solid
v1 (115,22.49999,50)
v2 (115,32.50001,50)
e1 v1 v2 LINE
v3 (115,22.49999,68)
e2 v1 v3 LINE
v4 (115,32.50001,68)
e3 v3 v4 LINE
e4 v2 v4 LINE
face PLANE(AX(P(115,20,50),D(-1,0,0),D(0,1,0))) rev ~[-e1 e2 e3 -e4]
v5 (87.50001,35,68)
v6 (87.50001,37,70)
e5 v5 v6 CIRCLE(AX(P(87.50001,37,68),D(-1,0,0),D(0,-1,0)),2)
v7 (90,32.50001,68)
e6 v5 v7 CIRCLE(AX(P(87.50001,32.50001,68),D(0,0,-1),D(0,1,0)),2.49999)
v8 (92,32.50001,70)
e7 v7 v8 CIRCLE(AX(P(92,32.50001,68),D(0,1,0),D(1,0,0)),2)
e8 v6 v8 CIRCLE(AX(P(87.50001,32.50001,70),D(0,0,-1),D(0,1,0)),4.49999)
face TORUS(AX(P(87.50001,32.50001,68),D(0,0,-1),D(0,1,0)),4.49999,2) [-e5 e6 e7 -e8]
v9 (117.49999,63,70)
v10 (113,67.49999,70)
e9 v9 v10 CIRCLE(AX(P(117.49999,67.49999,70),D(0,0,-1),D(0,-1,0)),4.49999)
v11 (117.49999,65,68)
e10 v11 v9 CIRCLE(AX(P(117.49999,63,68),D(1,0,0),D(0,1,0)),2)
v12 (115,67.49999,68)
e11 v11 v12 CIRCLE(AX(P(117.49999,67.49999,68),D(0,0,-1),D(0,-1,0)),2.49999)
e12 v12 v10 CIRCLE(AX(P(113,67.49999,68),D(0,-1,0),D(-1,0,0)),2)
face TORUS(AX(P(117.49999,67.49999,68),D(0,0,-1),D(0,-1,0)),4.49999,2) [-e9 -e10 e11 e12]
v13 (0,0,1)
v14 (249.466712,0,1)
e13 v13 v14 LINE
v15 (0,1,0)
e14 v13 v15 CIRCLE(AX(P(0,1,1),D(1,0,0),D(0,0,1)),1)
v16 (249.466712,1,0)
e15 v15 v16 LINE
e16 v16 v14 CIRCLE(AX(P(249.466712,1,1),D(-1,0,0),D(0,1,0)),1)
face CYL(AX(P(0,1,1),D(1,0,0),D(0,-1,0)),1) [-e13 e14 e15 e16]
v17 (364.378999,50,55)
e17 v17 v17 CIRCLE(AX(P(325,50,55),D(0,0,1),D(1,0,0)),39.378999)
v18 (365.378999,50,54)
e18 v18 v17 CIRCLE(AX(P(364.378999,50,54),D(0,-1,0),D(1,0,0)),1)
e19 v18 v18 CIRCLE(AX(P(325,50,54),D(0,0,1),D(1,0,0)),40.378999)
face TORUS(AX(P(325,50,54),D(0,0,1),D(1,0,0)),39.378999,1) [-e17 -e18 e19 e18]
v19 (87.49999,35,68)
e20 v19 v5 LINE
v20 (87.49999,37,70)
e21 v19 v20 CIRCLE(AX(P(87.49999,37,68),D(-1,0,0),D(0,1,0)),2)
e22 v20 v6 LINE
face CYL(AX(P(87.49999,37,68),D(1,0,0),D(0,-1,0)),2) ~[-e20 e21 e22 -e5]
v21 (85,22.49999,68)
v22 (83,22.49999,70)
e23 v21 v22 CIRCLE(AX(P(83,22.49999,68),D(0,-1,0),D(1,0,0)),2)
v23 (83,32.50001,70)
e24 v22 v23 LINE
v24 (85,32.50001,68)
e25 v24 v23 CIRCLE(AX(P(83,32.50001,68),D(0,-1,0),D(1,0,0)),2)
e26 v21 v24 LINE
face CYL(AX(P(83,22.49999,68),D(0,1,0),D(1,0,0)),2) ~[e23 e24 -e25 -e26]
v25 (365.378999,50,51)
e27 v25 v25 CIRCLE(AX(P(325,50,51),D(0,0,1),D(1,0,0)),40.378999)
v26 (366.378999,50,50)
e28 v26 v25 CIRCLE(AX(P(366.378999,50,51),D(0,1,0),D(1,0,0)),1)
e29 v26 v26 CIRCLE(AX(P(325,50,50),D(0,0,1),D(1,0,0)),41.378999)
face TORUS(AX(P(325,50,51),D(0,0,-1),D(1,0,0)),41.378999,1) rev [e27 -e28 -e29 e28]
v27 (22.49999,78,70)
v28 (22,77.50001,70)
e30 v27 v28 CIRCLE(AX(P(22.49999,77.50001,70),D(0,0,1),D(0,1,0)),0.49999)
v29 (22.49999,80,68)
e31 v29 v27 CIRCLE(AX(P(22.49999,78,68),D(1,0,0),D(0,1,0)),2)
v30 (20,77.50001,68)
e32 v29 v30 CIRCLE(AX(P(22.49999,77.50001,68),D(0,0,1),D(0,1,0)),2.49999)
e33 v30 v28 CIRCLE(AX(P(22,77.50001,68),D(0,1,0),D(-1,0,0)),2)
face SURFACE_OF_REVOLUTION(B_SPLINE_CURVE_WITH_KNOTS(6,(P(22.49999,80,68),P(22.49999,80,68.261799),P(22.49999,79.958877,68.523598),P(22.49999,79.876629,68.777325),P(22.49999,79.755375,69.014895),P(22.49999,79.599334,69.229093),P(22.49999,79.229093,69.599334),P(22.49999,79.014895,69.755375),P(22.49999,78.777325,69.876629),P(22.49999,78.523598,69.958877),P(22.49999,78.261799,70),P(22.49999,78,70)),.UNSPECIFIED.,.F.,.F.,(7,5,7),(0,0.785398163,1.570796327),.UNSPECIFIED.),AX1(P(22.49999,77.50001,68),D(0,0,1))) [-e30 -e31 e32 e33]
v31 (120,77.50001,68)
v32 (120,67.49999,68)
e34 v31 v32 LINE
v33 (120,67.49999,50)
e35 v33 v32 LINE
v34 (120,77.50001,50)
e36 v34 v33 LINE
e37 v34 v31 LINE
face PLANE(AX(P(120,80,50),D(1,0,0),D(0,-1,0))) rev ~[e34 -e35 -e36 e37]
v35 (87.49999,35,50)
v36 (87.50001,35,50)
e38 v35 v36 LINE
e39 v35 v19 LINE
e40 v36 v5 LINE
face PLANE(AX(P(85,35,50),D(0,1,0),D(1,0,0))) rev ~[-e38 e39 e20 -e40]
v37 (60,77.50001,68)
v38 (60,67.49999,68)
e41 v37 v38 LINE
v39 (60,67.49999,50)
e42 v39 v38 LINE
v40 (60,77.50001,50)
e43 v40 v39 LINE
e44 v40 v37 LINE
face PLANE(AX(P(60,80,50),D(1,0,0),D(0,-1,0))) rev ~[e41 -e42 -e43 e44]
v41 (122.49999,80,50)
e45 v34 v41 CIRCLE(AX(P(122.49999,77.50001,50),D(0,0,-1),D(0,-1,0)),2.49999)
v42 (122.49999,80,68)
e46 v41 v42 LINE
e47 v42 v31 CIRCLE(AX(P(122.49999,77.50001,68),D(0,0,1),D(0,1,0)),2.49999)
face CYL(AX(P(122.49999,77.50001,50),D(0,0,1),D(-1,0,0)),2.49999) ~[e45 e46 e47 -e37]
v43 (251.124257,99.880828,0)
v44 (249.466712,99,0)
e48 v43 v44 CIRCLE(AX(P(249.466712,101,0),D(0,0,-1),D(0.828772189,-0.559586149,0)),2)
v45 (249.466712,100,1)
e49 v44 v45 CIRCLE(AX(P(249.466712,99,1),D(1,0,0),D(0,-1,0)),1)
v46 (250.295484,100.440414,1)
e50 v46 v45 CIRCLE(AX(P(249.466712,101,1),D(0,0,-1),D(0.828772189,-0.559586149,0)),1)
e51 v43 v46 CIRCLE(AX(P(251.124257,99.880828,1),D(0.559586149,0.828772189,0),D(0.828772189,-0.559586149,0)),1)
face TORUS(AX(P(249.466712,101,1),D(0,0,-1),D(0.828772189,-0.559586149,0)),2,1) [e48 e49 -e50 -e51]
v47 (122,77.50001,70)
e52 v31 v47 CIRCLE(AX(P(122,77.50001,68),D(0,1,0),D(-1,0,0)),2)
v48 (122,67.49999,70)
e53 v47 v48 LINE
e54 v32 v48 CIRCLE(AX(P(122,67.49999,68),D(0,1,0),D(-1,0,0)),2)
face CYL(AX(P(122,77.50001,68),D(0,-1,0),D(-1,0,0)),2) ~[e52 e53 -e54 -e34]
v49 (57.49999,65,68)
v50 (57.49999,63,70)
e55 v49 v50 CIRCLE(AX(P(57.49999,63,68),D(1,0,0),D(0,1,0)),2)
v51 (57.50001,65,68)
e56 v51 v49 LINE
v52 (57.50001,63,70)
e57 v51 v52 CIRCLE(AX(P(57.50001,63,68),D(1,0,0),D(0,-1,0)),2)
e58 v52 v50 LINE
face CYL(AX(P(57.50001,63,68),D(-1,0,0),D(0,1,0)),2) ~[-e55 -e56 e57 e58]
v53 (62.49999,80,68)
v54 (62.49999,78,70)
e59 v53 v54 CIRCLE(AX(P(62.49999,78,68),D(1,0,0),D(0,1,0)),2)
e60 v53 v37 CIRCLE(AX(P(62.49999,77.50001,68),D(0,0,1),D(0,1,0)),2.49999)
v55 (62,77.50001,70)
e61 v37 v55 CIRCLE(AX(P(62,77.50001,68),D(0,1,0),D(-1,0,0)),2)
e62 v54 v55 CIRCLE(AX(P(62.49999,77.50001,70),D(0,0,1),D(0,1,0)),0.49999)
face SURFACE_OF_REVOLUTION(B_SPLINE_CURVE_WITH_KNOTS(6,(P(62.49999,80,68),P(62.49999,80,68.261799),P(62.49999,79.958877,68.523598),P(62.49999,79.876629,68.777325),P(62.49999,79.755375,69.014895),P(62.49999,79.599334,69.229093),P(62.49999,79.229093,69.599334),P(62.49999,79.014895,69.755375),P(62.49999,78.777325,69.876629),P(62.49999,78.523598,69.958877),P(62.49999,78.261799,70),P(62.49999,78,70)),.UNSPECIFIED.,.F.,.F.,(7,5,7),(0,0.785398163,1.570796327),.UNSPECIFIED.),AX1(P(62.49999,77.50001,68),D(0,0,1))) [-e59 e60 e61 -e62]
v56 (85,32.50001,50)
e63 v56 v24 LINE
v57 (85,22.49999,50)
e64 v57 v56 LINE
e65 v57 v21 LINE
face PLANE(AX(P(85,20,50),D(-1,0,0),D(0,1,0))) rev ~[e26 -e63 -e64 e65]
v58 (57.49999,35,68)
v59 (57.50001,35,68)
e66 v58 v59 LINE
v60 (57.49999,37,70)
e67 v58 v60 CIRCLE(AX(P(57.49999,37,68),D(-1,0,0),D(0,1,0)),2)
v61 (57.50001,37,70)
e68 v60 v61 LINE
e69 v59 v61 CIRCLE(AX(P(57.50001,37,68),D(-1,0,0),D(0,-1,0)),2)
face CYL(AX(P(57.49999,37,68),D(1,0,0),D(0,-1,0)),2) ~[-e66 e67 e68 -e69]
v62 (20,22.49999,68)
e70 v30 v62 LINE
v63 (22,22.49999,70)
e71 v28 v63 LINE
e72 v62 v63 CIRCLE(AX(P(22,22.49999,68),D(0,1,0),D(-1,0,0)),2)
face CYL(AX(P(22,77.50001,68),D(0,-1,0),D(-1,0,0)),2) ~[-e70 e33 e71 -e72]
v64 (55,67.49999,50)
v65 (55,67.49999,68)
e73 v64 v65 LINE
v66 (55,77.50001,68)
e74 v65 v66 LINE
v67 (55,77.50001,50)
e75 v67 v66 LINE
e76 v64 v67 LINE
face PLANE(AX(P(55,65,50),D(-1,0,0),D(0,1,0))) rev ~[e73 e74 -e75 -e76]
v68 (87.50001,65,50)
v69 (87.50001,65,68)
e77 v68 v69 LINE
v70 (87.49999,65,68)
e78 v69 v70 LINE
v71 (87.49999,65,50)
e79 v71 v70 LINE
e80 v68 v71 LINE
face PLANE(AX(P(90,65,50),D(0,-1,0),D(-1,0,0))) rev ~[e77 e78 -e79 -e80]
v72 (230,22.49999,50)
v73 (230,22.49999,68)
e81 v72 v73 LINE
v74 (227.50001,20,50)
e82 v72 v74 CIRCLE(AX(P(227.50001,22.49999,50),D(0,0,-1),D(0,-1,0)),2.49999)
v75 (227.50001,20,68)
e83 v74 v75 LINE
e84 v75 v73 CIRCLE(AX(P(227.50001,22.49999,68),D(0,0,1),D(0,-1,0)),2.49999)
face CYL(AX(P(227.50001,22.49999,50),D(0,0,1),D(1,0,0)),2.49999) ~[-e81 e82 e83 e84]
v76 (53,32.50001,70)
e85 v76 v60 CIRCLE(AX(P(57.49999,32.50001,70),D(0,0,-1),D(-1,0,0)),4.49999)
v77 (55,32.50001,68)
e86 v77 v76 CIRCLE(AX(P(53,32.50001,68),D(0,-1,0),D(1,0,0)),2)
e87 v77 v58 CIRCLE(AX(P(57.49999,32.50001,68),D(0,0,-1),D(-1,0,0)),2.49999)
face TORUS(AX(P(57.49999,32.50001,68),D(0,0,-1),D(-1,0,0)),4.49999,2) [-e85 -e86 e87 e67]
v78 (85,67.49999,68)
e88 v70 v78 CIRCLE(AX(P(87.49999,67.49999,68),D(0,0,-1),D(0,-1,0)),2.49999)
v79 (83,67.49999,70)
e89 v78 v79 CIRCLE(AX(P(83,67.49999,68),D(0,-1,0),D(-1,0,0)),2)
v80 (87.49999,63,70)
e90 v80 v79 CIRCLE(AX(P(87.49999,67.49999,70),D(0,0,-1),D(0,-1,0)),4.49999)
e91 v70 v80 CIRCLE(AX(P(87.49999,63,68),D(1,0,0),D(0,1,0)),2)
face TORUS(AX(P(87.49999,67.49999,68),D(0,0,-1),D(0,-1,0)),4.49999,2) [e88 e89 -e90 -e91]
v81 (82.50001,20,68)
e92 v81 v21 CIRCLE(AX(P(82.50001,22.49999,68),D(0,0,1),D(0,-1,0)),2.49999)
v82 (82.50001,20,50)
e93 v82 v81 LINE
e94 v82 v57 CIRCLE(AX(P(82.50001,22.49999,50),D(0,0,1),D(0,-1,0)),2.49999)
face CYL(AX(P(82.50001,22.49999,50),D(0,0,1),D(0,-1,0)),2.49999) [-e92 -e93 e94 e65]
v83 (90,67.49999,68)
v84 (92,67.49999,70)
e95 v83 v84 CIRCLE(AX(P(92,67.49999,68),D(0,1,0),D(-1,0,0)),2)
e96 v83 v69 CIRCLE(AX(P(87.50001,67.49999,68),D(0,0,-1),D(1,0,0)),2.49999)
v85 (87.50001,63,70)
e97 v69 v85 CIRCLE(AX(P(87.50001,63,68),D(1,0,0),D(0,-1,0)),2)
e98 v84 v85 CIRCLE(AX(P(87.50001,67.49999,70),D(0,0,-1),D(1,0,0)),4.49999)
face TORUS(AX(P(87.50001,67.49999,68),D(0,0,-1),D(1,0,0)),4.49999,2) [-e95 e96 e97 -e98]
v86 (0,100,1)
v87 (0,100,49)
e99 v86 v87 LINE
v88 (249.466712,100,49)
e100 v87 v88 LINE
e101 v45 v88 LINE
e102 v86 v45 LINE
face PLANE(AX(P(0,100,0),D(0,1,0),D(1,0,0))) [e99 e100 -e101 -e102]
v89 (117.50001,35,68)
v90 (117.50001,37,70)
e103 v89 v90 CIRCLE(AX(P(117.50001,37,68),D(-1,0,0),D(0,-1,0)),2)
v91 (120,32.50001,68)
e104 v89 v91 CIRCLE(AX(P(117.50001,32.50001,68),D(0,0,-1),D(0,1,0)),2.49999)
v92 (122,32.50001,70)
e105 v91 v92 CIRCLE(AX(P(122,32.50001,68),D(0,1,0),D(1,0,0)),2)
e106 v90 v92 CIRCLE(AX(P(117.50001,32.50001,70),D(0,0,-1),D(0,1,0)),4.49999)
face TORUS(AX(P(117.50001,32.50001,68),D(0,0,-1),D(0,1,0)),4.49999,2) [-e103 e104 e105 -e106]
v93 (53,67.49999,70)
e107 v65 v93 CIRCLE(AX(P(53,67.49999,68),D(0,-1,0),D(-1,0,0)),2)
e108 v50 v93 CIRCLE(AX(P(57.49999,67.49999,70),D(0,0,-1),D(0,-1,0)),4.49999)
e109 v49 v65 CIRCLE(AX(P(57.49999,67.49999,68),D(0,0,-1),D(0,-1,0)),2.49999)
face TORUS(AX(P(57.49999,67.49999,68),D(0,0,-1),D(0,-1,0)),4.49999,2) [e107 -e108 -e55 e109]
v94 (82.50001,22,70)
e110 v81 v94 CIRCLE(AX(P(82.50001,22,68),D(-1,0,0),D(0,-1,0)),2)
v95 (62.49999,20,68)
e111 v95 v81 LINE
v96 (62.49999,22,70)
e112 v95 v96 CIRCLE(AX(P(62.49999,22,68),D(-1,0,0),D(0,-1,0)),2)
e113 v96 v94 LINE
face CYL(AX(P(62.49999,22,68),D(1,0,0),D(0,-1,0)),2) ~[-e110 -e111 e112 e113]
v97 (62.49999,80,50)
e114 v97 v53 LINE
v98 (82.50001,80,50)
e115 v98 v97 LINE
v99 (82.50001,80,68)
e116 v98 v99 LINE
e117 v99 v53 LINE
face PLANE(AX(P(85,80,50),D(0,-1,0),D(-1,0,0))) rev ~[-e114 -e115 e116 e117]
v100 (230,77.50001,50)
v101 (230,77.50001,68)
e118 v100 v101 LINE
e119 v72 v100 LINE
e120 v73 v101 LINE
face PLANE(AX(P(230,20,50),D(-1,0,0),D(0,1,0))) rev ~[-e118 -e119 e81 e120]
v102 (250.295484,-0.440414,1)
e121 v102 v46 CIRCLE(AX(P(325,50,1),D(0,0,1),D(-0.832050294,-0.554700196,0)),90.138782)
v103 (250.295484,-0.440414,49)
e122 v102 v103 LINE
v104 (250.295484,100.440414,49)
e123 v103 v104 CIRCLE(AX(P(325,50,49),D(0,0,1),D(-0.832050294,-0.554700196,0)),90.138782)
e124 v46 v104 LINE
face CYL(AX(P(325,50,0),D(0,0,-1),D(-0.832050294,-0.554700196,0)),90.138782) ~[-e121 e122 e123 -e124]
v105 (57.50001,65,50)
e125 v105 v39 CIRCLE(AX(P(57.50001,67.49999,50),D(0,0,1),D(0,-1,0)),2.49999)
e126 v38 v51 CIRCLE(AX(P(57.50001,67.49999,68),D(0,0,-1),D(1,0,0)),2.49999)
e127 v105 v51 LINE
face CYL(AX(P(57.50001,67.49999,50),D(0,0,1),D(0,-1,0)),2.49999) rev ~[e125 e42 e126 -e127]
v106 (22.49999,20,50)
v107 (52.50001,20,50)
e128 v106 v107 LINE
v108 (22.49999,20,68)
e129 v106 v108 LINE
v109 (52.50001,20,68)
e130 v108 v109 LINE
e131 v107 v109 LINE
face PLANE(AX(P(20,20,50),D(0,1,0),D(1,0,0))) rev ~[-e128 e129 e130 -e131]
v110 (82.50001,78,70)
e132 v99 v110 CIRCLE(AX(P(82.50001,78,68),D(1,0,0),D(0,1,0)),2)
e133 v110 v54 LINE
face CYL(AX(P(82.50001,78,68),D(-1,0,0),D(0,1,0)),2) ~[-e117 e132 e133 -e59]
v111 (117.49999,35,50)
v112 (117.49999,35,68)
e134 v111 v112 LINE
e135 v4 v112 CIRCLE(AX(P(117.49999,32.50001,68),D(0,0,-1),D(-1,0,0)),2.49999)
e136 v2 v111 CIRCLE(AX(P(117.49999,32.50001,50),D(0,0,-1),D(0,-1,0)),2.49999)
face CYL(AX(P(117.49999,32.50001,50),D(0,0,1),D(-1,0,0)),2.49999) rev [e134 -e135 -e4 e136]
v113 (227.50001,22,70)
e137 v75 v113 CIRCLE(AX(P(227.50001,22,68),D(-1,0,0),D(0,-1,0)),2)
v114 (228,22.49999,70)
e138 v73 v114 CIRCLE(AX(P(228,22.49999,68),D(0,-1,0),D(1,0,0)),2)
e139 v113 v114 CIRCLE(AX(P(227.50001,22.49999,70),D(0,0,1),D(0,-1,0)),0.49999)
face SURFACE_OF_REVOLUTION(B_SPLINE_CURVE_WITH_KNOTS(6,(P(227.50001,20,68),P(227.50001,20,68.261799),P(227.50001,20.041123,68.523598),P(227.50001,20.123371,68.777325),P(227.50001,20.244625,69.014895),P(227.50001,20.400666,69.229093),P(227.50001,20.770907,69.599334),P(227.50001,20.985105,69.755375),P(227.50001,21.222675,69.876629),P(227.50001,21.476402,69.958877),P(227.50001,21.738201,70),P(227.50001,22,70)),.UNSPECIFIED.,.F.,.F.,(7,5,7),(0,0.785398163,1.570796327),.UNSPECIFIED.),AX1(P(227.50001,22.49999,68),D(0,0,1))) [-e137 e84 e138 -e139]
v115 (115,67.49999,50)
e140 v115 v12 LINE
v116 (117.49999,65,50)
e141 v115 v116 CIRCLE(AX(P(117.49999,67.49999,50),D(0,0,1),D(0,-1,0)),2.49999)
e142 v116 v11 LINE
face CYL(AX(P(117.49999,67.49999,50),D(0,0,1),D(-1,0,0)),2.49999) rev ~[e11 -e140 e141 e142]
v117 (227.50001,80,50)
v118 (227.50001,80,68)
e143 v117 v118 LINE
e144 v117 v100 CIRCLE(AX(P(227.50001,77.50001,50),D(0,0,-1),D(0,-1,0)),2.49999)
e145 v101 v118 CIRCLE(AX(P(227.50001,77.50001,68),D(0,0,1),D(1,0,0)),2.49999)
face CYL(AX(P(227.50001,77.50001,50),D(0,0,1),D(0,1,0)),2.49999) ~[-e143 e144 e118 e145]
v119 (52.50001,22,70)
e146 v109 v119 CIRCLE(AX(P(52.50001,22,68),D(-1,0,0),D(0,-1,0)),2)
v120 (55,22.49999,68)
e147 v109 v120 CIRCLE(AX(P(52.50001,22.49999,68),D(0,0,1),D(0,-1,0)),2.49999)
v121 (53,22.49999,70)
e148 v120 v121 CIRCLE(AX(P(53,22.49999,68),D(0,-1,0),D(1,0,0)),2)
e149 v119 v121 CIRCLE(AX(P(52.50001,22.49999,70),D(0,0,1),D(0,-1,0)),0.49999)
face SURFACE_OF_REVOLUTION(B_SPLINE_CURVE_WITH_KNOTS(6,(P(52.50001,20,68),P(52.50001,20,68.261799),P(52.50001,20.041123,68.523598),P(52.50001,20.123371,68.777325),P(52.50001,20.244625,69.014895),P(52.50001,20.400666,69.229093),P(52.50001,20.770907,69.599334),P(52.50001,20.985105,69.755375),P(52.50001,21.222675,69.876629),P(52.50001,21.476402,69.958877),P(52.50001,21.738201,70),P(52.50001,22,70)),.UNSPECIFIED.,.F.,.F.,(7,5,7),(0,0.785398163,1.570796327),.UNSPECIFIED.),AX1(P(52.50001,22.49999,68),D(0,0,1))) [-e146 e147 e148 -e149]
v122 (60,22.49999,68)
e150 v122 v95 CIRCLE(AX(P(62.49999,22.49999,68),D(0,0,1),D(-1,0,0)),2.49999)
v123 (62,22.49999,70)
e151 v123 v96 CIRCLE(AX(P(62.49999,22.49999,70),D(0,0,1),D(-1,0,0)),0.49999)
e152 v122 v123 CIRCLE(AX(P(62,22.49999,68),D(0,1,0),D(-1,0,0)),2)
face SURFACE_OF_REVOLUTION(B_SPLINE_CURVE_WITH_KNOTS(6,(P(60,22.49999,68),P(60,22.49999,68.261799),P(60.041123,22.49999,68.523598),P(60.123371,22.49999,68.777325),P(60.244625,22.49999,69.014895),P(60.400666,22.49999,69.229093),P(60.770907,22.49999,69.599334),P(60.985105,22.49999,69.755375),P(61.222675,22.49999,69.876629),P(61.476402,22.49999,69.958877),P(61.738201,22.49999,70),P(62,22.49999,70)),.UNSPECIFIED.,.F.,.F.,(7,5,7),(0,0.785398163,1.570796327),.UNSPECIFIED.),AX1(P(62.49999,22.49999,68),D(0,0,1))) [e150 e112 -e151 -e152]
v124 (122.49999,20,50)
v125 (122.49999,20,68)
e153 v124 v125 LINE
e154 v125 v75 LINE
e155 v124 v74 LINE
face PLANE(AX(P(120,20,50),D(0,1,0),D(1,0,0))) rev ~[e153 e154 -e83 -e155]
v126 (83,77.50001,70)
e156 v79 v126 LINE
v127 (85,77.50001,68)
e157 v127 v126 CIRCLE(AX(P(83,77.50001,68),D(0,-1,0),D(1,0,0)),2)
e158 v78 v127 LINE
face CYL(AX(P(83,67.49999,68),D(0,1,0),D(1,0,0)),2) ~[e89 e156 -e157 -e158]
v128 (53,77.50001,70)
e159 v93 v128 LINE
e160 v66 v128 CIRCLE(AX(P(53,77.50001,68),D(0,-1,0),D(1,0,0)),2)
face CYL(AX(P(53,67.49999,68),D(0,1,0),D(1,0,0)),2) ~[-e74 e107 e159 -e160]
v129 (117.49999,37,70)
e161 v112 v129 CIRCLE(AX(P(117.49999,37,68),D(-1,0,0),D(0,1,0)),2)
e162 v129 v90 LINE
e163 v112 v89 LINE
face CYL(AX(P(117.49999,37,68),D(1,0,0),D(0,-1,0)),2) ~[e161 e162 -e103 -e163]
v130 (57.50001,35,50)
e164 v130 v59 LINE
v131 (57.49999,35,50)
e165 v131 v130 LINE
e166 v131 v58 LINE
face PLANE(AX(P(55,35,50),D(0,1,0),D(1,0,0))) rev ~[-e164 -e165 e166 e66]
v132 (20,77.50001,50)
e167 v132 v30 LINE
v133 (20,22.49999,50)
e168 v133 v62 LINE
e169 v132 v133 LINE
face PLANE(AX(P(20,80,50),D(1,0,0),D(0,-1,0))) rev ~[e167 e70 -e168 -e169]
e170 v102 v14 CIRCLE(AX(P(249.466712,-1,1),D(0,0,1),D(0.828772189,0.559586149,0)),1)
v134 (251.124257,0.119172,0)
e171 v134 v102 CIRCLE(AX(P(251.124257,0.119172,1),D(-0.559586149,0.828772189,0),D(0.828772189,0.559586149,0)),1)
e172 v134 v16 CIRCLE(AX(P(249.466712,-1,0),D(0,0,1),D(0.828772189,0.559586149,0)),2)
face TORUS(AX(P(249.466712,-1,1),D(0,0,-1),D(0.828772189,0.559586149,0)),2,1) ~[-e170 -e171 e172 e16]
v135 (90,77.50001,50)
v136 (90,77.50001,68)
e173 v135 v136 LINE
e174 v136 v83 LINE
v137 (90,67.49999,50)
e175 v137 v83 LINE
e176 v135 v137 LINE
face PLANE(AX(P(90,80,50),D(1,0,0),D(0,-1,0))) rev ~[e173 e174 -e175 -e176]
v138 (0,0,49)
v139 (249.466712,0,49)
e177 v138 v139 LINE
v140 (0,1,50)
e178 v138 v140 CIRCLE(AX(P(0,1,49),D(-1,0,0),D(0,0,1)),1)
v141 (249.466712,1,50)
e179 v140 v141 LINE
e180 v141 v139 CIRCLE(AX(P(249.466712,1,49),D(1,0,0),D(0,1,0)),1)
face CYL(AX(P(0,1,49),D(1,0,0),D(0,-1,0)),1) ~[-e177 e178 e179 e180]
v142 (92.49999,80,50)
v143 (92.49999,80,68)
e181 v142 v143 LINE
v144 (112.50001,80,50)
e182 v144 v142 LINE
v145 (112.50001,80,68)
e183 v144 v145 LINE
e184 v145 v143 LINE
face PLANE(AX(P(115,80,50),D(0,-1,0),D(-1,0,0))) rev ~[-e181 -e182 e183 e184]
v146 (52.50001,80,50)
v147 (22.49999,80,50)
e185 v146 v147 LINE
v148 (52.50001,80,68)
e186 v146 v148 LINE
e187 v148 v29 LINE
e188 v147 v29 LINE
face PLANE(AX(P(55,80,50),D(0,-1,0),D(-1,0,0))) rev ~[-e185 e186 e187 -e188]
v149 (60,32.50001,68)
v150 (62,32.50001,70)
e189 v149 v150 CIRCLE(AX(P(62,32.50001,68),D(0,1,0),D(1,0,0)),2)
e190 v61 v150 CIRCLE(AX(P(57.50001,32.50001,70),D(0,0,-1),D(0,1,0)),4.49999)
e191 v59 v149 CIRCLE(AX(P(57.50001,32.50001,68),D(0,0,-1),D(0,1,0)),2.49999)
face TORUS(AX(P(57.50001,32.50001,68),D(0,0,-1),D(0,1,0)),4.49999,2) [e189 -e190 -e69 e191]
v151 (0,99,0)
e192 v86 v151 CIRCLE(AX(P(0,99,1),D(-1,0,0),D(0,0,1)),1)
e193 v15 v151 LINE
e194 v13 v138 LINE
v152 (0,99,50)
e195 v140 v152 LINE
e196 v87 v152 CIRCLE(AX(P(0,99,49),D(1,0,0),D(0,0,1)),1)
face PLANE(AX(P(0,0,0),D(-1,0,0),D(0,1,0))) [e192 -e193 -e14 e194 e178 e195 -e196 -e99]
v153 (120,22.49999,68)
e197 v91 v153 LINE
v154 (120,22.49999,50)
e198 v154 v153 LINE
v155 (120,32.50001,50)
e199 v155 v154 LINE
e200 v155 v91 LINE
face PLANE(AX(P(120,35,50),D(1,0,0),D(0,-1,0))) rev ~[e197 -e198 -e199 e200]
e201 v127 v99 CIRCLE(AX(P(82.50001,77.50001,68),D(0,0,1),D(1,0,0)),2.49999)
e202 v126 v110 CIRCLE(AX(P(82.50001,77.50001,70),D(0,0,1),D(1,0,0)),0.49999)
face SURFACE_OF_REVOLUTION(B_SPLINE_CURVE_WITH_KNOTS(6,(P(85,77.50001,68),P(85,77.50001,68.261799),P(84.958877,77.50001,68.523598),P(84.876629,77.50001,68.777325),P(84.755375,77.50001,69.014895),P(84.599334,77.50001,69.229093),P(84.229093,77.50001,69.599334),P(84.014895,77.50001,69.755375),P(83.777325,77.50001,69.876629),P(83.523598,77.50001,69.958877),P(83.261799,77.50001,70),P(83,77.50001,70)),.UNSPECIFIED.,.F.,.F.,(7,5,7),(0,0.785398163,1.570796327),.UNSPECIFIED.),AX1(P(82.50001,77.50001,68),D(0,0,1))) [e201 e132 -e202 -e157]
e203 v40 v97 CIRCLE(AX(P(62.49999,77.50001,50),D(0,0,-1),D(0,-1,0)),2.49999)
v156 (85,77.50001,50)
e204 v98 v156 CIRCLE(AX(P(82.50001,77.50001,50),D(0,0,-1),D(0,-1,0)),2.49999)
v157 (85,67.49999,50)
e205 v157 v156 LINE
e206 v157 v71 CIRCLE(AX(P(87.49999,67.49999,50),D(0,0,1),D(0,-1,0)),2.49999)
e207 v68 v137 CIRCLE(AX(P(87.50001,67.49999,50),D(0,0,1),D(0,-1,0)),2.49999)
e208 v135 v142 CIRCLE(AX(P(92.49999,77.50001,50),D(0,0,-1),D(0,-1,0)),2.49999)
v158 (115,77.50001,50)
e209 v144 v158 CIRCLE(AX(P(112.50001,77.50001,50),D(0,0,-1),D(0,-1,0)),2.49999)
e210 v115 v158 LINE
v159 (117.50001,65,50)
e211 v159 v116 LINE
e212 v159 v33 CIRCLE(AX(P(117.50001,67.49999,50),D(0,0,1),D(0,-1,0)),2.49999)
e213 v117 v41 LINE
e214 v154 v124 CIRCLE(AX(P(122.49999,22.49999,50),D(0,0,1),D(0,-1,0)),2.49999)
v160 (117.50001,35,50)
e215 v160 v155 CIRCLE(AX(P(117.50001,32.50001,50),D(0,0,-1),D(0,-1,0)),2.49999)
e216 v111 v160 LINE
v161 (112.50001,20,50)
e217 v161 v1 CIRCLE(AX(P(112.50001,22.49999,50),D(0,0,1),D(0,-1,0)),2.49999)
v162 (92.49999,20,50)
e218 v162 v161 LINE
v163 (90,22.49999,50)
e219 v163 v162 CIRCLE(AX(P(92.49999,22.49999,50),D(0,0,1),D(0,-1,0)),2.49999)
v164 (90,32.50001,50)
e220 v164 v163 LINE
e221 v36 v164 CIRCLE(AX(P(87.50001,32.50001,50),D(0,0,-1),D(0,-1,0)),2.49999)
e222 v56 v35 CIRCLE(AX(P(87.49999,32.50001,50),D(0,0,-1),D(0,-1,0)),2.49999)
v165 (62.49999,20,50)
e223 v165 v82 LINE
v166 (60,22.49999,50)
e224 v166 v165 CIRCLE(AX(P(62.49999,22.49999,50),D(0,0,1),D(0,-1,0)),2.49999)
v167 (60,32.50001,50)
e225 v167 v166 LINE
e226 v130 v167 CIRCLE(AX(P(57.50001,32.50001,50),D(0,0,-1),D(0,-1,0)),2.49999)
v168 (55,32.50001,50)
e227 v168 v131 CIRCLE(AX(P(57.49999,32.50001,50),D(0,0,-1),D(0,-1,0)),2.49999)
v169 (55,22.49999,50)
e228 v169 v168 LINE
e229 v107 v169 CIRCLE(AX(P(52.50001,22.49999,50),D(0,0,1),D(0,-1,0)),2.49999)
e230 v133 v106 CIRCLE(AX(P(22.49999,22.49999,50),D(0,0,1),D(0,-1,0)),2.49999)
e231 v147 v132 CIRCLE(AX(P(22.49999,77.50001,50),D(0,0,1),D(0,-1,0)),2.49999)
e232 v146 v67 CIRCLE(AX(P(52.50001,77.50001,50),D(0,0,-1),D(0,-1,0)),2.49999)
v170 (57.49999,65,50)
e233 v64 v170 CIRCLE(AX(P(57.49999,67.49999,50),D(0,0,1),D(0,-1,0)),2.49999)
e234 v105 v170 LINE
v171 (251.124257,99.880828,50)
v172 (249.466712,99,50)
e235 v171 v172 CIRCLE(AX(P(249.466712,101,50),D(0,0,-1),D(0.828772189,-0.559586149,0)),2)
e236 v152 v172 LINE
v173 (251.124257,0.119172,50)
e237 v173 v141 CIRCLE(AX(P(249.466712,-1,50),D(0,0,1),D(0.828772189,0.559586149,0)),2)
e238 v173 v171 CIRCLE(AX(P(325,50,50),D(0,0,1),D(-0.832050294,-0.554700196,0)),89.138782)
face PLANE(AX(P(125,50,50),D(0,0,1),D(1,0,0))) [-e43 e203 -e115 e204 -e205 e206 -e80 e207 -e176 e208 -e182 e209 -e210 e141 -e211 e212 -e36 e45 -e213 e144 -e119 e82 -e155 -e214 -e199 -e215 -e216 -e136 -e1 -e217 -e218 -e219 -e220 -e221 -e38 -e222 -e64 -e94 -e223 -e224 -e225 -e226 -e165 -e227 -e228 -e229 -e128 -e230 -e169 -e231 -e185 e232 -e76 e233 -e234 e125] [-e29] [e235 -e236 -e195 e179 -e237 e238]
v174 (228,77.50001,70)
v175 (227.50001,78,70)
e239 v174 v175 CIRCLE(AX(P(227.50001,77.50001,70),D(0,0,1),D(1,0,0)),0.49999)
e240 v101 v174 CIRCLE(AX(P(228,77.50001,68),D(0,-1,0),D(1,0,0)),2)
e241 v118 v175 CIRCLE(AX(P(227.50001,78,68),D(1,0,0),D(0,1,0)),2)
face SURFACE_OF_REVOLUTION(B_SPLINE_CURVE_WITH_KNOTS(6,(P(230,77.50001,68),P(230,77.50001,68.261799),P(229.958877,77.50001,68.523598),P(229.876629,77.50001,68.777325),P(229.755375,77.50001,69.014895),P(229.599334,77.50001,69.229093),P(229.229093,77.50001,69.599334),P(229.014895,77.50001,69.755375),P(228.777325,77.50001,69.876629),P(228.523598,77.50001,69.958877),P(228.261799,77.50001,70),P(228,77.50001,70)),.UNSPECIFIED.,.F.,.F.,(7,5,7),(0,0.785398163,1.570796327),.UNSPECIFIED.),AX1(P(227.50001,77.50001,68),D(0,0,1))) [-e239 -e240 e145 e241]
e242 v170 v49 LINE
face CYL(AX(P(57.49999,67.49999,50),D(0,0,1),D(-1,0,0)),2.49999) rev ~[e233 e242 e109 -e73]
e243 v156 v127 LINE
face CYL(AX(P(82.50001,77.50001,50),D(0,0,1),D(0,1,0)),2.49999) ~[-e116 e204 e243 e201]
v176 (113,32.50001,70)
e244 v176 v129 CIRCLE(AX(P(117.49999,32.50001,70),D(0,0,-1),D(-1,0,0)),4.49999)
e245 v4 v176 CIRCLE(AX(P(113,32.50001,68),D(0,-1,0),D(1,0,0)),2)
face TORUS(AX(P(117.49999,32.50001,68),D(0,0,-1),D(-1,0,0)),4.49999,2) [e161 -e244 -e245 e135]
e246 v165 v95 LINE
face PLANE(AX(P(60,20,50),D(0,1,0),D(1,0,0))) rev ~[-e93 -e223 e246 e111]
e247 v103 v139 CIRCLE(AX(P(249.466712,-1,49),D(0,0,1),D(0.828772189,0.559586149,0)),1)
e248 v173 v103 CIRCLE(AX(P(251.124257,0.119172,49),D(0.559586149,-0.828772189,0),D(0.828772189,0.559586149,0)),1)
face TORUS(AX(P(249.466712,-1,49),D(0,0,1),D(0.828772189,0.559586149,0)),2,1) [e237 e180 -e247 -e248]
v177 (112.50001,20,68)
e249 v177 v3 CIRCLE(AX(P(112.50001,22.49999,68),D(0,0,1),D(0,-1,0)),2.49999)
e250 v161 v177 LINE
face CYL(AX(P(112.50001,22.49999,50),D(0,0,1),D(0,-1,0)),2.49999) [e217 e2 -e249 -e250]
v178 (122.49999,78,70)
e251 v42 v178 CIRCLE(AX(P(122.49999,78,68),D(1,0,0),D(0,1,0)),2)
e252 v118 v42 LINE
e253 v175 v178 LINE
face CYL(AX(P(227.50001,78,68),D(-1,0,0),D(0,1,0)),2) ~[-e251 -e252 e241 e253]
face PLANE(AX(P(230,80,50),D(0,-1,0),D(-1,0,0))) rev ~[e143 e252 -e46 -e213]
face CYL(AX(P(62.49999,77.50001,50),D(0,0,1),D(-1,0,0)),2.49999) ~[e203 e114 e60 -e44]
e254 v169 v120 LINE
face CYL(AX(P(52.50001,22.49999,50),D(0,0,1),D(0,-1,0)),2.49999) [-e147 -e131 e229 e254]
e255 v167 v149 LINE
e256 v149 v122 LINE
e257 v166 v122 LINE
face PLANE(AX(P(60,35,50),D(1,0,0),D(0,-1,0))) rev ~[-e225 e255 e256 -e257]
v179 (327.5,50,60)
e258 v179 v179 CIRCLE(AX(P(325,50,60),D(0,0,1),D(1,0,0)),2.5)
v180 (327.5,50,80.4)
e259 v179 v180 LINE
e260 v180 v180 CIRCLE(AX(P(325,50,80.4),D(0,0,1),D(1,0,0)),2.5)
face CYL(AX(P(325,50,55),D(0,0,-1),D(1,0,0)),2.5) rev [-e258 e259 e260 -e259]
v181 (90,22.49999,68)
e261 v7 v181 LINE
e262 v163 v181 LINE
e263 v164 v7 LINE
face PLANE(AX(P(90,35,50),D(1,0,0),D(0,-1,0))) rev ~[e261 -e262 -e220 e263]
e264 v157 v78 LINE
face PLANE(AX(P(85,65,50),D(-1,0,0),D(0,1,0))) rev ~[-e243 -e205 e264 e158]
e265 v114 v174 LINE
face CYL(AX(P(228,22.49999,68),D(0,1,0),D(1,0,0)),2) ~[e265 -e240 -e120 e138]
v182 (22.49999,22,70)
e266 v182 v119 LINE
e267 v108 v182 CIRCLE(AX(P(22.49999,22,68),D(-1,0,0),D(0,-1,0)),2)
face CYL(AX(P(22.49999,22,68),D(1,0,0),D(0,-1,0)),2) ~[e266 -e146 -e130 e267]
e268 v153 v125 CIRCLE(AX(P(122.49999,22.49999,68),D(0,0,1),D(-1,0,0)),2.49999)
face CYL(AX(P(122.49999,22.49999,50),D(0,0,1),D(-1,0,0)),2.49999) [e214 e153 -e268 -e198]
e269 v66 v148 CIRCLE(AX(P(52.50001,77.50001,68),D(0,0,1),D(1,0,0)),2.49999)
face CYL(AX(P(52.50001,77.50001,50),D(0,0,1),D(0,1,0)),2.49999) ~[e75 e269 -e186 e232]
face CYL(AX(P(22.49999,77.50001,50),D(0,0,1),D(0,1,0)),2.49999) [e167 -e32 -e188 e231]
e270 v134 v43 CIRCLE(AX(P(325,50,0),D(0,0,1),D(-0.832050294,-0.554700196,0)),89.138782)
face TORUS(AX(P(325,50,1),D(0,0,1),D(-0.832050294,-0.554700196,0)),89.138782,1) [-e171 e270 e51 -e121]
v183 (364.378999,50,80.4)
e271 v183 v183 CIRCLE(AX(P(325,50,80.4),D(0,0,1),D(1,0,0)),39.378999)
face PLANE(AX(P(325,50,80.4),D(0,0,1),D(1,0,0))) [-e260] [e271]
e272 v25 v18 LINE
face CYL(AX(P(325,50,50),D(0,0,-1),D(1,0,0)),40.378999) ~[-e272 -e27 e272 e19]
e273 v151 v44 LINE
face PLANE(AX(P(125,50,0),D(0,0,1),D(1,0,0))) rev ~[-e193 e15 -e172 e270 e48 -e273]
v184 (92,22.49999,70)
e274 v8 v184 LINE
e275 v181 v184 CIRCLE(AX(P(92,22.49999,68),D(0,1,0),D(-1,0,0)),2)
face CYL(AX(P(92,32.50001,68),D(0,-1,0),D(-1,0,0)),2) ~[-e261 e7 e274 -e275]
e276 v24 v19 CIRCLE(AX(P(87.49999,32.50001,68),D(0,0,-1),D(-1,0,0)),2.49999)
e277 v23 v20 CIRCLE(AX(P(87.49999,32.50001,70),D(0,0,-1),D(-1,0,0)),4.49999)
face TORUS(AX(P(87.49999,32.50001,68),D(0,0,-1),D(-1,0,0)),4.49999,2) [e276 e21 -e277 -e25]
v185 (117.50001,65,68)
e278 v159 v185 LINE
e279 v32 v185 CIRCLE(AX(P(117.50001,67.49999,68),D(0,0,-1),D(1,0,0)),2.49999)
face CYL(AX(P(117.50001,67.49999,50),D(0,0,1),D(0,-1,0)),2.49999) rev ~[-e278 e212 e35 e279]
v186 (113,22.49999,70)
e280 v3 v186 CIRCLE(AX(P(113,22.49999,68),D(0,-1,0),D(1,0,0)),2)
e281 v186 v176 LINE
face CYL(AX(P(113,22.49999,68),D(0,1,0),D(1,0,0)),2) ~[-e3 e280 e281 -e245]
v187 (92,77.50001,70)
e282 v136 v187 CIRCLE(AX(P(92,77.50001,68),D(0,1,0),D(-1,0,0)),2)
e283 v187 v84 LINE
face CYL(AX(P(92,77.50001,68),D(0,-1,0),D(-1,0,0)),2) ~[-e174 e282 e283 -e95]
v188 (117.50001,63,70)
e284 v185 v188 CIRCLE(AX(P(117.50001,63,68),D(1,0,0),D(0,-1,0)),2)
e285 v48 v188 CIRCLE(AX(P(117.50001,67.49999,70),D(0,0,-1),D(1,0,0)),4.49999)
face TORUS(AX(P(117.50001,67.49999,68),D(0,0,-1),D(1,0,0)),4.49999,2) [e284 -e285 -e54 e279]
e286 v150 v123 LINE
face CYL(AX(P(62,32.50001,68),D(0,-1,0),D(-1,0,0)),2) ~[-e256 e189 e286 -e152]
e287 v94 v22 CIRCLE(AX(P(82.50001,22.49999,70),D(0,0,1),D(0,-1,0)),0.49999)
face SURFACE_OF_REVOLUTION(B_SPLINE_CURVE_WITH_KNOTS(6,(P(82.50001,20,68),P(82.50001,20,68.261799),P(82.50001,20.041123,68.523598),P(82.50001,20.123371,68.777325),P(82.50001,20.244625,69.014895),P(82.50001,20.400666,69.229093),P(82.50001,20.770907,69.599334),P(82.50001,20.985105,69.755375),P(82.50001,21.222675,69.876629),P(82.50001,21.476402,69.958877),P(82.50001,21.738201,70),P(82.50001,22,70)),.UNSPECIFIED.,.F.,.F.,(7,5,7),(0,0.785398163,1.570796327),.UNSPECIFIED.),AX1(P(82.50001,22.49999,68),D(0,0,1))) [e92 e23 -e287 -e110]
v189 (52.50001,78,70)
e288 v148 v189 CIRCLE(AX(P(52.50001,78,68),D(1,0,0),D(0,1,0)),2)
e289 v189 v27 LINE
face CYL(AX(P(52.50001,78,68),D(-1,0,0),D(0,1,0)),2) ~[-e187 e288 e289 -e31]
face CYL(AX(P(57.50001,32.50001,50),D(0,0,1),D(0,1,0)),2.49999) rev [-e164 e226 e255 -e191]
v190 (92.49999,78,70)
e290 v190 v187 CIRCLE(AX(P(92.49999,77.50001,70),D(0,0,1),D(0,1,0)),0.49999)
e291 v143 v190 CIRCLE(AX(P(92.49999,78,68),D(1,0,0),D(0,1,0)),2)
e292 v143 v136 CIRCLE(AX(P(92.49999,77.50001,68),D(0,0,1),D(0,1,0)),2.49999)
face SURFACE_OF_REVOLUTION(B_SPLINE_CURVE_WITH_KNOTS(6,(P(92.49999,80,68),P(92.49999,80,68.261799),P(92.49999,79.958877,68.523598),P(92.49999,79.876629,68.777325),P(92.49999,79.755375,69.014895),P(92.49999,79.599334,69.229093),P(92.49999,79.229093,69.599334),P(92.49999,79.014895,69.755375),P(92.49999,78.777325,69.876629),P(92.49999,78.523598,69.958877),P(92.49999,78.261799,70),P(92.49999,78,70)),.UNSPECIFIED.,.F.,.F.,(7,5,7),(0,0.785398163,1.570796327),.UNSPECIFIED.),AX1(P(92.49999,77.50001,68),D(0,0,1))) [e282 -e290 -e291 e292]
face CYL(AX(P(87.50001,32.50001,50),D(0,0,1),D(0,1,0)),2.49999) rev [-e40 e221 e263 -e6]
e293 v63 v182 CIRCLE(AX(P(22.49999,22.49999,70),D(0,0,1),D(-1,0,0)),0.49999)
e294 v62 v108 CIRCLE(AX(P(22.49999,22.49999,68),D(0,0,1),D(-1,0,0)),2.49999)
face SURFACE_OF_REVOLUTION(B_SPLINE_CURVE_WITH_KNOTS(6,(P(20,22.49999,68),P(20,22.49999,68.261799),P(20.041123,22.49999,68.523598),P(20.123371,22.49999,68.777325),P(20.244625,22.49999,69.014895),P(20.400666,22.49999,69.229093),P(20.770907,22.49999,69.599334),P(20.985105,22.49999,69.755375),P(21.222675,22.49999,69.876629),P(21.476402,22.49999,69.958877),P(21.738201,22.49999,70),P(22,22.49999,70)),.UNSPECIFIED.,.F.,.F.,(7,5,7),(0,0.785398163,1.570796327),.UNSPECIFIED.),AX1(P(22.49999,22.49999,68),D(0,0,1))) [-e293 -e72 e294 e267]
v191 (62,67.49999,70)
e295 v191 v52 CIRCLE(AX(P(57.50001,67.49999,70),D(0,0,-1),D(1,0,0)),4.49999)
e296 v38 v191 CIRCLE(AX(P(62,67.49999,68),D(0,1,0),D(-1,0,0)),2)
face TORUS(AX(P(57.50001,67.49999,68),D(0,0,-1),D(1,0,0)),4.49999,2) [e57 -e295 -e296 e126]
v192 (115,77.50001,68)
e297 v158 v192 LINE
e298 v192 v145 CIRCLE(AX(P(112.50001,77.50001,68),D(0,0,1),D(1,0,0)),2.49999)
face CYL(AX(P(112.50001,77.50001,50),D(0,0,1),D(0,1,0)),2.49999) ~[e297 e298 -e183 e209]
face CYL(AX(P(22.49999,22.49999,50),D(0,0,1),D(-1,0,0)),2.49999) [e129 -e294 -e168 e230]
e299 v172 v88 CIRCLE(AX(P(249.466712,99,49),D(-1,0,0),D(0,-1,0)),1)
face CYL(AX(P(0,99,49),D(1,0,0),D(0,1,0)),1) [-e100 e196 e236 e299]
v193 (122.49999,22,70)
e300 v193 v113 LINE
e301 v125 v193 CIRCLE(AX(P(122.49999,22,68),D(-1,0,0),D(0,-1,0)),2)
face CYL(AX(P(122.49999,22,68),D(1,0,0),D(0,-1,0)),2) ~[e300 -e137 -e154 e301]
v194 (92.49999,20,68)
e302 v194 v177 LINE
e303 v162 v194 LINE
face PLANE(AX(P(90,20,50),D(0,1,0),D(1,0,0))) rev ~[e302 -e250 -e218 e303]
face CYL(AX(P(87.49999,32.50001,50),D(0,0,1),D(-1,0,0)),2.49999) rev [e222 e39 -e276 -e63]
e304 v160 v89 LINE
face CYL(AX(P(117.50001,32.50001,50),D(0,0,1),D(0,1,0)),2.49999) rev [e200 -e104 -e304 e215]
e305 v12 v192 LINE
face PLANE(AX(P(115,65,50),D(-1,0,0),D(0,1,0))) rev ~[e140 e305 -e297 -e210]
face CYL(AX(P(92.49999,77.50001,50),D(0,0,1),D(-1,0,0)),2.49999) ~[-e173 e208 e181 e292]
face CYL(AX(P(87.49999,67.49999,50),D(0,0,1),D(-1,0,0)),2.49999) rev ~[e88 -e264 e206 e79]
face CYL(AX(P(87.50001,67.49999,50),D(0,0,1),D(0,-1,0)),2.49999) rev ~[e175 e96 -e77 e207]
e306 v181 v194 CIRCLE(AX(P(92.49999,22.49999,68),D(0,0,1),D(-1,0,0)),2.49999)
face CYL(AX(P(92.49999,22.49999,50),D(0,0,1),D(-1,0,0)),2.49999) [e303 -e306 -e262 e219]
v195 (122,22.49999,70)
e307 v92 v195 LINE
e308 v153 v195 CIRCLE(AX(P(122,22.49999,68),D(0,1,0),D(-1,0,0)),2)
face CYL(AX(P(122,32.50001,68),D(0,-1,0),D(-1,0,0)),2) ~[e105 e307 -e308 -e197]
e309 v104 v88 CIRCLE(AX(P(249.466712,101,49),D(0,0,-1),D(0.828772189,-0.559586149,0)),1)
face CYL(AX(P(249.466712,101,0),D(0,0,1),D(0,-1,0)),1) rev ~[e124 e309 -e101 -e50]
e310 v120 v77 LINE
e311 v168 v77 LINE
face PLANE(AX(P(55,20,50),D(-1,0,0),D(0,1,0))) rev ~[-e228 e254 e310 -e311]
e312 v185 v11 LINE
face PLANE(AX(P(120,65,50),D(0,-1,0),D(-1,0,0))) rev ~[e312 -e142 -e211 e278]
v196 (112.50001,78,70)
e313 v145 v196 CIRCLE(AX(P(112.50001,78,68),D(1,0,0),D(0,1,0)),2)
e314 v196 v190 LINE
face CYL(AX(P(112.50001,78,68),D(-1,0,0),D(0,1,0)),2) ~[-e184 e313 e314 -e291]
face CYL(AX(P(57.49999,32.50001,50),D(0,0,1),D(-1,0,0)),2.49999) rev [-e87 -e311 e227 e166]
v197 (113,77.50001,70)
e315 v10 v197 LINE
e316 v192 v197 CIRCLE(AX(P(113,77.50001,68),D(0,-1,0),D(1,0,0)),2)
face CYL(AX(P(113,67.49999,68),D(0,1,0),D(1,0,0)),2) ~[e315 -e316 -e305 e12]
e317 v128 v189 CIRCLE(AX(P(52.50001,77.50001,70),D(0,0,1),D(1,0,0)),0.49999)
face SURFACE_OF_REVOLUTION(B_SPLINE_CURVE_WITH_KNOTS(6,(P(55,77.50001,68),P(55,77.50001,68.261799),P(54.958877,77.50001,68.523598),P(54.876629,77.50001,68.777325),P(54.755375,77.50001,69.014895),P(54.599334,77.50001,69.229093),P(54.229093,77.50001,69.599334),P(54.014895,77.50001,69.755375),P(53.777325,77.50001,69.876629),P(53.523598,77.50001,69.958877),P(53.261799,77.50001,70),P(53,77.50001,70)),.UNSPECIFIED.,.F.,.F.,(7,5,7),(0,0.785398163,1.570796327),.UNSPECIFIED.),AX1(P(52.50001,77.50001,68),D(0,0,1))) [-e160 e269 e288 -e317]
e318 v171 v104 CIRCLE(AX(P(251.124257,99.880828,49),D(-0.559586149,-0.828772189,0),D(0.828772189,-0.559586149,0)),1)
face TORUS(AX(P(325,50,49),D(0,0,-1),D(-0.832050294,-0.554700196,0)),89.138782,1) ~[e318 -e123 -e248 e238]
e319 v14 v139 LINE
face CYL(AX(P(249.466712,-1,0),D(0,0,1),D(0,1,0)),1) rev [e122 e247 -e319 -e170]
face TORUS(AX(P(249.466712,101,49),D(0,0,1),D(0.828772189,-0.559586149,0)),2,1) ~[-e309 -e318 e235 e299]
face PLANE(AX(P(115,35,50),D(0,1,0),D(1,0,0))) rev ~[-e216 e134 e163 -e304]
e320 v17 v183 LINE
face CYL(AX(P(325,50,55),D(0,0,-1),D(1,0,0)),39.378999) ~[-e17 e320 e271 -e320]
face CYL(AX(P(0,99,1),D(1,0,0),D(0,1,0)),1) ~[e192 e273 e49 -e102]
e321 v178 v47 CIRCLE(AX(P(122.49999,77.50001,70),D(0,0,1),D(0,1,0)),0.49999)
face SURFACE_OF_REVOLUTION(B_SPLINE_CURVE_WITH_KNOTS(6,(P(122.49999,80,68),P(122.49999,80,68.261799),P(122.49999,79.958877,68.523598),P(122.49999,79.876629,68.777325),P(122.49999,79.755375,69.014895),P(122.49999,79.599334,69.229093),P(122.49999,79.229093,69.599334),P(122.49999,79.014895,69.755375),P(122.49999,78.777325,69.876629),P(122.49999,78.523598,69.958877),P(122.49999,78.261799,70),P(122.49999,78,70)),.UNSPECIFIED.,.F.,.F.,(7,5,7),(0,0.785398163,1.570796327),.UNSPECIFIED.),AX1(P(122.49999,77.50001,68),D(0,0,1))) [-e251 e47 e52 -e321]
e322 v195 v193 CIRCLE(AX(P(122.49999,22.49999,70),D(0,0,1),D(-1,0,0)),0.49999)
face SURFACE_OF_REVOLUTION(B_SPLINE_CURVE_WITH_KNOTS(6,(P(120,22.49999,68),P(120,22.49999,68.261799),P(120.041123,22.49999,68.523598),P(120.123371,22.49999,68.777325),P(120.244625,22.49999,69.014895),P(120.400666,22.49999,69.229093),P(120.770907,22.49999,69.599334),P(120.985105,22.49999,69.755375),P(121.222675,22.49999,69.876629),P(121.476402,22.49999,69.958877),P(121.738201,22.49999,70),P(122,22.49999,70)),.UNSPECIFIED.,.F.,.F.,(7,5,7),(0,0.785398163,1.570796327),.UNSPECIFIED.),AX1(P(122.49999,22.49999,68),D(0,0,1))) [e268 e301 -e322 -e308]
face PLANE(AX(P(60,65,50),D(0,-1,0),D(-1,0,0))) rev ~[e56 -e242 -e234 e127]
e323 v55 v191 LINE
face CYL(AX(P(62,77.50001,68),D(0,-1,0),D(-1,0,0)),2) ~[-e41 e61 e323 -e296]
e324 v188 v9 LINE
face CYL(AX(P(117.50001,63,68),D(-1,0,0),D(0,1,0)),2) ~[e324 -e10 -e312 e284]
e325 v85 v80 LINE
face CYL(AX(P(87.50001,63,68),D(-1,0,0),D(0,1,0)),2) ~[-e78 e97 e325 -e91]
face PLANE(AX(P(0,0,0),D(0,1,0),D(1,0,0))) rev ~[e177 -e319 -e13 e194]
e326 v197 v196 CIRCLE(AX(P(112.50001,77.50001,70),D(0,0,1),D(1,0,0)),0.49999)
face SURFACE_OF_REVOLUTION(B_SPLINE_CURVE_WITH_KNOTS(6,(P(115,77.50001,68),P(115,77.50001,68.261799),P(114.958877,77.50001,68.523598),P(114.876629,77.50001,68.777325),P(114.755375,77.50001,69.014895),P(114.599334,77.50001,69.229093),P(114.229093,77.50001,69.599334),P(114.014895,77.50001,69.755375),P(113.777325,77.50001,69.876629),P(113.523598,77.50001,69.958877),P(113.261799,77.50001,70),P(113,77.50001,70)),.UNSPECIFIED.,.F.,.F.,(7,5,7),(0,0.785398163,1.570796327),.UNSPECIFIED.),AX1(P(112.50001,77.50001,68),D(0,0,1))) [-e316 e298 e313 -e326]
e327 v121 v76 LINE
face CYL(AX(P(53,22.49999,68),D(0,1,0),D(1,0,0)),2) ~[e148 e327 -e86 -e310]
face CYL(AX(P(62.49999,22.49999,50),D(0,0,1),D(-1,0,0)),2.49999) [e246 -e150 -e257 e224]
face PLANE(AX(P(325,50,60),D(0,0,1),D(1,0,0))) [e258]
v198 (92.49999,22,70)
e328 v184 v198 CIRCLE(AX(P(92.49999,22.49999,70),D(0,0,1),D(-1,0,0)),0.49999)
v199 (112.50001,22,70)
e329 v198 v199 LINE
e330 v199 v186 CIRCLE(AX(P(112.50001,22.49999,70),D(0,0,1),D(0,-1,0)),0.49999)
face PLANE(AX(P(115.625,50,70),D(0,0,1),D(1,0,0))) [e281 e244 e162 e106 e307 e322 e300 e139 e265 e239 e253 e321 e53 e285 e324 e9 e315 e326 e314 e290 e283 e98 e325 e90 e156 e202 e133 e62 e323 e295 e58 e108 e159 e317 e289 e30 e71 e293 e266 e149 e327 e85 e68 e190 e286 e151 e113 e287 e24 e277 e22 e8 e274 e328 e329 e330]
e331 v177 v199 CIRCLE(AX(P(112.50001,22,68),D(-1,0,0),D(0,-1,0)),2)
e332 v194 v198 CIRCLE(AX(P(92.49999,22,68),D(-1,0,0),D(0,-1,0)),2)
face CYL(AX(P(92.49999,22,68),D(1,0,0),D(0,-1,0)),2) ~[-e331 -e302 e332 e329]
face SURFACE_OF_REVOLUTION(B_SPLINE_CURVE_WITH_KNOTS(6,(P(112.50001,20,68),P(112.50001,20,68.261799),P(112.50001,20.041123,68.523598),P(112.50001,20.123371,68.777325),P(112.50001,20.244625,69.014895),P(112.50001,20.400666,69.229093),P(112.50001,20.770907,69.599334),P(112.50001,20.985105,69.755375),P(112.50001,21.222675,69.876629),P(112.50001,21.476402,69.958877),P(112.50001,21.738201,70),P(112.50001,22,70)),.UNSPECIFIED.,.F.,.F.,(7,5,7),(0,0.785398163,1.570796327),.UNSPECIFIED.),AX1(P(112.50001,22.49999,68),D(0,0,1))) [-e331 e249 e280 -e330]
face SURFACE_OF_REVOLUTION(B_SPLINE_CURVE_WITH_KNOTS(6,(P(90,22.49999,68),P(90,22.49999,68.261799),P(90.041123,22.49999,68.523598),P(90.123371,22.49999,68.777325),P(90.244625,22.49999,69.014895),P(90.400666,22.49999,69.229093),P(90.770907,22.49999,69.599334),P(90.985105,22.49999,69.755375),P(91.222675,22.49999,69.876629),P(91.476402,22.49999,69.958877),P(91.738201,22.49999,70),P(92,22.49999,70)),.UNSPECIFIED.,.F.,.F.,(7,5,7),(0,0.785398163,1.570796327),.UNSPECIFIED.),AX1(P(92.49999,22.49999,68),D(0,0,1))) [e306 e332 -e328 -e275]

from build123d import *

# Parameters (mm, degrees)
F0_W      = 250
F0_H      = 100
F1_DEPTH  = 50
F3_DEPTH  = 20
F4_R      = 40.3789988007
F5_DEPTH  = 5
F6_R      = 2.5
F7_DEPTH  = 5
F8_R      = 1
F9_R      = 2.49999
F10_R     = 2
F11_DEPTH = 25.4


# Not quite as in the source:
# - a fillet or chamfer is up to 0.001 mm smaller than in the source, because OpenCascade refuses the exact size


with BuildPart() as f1:
    # F0 (on Top) → F1 (new body)
    with BuildSketch(Plane.XY):
        with Locations((125, 50)):
            Rectangle(F0_W, F0_H)
        with BuildLine():
            Line((250, 100), (250, 0))
            ThreePointArc((250, 0), (415.1387818866, 50), (250, 100))
        make_face()
    extrude(amount=F1_DEPTH)

    # F2 (on face) → F3 (join)
    with BuildSketch(Plane.XY.offset(50)):
        Polygon((55, 80), (20, 80), (20, 20), (55, 20), (55, 35), (60, 35), (60, 20), (85, 20), (85, 35), (90, 35), (90, 20), (115, 20), (115, 35), (120, 35), (120, 20), (230, 20), (230, 80), (120, 80), (120, 65), (115, 65), (115, 80), (90, 80), (90, 65), (85, 65), (85, 80), (60, 80), (60, 65), (55, 65), align=None)
    extrude(amount=F3_DEPTH)

    # F4 (on face) → F5 (join)
    with BuildSketch(Plane.XY.offset(50)):
        with Locations((325, 50)):
            Circle(F4_R)
    extrude(amount=F5_DEPTH)

    # F6 (on face) → F7 (join)
    with BuildSketch(Plane.XY.offset(55)):
        with Locations((325, 50)):
            Circle(F6_R)
    extrude(amount=F7_DEPTH)

    # F8
    f8_edges = [f1.edges().sort_by_distance(p)[0] for p in [
        (250, 0, 25),
        (250, 100, 25),
        (415.138782, 50, 0),
        (415.138782, 50, 50),
        (284.621001, 50, 55),
        (284.621001, 50, 50),
        (125, 100, 0),
        (125, 100, 50),
        (125, 0, 0),
        (125, 0, 50),
    ]]
    fillet(f8_edges, radius=F8_R)

    # F9 (radius 2.5 in the source; OpenCascade refuses exactly that, so slightly less here)
    f9_edges = [f1.edges().sort_by_distance(p)[0] for p in [
        (55, 35, 60),
        (55, 20, 60),
        (60, 35, 60),
        (60, 20, 60),
        (85, 20, 60),
        (90, 35, 60),
        (90, 20, 60),
        (115, 20, 60),
        (120, 35, 60),
        (120, 20, 60),
        (85, 35, 60),
        (115, 35, 60),
        (55, 65, 60),
        (55, 80, 60),
        (85, 65, 60),
        (85, 80, 60),
        (115, 65, 60),
        (115, 80, 60),
        (60, 65, 60),
        (60, 80, 60),
        (90, 65, 60),
        (90, 80, 60),
        (120, 65, 60),
        (120, 80, 60),
        (20, 80, 60),
        (20, 20, 60),
        (230, 80, 60),
        (230, 20, 60),
    ]]
    fillet(f9_edges, radius=F9_R)

    # F10
    f10_edges = [f1.edges().sort_by_distance(p)[0] for p in [
        (175, 80, 70),
        (230, 50, 70),
        (37.5, 80, 70),
        (54.26777, 79.26777, 70),
        (20.73223, 79.26777, 70),
        (55, 72.5, 70),
        (20, 50, 70),
        (55.73223, 65.73223, 70),
        (20.73223, 20.73223, 70),
        (57.5, 65, 70),
        (37.5, 20, 70),
        (59.26777, 65.73223, 70),
        (54.26777, 20.73223, 70),
        (60, 72.5, 70),
        (55, 27.5, 70),
        (60.73223, 79.26777, 70),
        (55.73223, 34.26777, 70),
        (72.5, 80, 70),
        (57.5, 35, 70),
        (84.26777, 79.26777, 70),
        (59.26777, 34.26777, 70),
        (85, 72.5, 70),
        (60, 27.5, 70),
        (85.73223, 65.73223, 70),
        (60.73223, 20.73223, 70),
        (87.5, 65, 70),
        (72.5, 20, 70),
        (89.26777, 65.73223, 70),
        (84.26777, 20.73223, 70),
        (90, 72.5, 70),
        (85, 27.5, 70),
        (90.73223, 79.26777, 70),
        (85.73223, 34.26777, 70),
        (102.5, 80, 70),
        (87.5, 35, 70),
        (114.26777, 79.26777, 70),
        (89.26777, 34.26777, 70),
        (115, 72.5, 70),
        (90, 27.5, 70),
        (115.73223, 65.73223, 70),
        (90.73223, 20.73223, 70),
        (117.5, 65, 70),
        (102.5, 20, 70),
        (119.26777, 65.73223, 70),
        (114.26777, 20.73223, 70),
        (120, 72.5, 70),
        (115, 27.5, 70),
        (120.73223, 79.26777, 70),
        (115.73223, 34.26777, 70),
        (117.5, 35, 70),
        (229.26777, 79.26777, 70),
        (119.26777, 34.26777, 70),
        (120, 27.5, 70),
        (229.26777, 20.73223, 70),
        (120.73223, 20.73223, 70),
        (175, 20, 70),
    ]]
    fillet(f10_edges, radius=F10_R)

    # F11 (add): a face of the model
    f11_faces = [f1.faces().sort_by_distance(p)[0] for p in [
        (286.7348074828, 50, 55),
    ]]
    extrude(f11_faces, amount=F11_DEPTH)


solid = f1.part
